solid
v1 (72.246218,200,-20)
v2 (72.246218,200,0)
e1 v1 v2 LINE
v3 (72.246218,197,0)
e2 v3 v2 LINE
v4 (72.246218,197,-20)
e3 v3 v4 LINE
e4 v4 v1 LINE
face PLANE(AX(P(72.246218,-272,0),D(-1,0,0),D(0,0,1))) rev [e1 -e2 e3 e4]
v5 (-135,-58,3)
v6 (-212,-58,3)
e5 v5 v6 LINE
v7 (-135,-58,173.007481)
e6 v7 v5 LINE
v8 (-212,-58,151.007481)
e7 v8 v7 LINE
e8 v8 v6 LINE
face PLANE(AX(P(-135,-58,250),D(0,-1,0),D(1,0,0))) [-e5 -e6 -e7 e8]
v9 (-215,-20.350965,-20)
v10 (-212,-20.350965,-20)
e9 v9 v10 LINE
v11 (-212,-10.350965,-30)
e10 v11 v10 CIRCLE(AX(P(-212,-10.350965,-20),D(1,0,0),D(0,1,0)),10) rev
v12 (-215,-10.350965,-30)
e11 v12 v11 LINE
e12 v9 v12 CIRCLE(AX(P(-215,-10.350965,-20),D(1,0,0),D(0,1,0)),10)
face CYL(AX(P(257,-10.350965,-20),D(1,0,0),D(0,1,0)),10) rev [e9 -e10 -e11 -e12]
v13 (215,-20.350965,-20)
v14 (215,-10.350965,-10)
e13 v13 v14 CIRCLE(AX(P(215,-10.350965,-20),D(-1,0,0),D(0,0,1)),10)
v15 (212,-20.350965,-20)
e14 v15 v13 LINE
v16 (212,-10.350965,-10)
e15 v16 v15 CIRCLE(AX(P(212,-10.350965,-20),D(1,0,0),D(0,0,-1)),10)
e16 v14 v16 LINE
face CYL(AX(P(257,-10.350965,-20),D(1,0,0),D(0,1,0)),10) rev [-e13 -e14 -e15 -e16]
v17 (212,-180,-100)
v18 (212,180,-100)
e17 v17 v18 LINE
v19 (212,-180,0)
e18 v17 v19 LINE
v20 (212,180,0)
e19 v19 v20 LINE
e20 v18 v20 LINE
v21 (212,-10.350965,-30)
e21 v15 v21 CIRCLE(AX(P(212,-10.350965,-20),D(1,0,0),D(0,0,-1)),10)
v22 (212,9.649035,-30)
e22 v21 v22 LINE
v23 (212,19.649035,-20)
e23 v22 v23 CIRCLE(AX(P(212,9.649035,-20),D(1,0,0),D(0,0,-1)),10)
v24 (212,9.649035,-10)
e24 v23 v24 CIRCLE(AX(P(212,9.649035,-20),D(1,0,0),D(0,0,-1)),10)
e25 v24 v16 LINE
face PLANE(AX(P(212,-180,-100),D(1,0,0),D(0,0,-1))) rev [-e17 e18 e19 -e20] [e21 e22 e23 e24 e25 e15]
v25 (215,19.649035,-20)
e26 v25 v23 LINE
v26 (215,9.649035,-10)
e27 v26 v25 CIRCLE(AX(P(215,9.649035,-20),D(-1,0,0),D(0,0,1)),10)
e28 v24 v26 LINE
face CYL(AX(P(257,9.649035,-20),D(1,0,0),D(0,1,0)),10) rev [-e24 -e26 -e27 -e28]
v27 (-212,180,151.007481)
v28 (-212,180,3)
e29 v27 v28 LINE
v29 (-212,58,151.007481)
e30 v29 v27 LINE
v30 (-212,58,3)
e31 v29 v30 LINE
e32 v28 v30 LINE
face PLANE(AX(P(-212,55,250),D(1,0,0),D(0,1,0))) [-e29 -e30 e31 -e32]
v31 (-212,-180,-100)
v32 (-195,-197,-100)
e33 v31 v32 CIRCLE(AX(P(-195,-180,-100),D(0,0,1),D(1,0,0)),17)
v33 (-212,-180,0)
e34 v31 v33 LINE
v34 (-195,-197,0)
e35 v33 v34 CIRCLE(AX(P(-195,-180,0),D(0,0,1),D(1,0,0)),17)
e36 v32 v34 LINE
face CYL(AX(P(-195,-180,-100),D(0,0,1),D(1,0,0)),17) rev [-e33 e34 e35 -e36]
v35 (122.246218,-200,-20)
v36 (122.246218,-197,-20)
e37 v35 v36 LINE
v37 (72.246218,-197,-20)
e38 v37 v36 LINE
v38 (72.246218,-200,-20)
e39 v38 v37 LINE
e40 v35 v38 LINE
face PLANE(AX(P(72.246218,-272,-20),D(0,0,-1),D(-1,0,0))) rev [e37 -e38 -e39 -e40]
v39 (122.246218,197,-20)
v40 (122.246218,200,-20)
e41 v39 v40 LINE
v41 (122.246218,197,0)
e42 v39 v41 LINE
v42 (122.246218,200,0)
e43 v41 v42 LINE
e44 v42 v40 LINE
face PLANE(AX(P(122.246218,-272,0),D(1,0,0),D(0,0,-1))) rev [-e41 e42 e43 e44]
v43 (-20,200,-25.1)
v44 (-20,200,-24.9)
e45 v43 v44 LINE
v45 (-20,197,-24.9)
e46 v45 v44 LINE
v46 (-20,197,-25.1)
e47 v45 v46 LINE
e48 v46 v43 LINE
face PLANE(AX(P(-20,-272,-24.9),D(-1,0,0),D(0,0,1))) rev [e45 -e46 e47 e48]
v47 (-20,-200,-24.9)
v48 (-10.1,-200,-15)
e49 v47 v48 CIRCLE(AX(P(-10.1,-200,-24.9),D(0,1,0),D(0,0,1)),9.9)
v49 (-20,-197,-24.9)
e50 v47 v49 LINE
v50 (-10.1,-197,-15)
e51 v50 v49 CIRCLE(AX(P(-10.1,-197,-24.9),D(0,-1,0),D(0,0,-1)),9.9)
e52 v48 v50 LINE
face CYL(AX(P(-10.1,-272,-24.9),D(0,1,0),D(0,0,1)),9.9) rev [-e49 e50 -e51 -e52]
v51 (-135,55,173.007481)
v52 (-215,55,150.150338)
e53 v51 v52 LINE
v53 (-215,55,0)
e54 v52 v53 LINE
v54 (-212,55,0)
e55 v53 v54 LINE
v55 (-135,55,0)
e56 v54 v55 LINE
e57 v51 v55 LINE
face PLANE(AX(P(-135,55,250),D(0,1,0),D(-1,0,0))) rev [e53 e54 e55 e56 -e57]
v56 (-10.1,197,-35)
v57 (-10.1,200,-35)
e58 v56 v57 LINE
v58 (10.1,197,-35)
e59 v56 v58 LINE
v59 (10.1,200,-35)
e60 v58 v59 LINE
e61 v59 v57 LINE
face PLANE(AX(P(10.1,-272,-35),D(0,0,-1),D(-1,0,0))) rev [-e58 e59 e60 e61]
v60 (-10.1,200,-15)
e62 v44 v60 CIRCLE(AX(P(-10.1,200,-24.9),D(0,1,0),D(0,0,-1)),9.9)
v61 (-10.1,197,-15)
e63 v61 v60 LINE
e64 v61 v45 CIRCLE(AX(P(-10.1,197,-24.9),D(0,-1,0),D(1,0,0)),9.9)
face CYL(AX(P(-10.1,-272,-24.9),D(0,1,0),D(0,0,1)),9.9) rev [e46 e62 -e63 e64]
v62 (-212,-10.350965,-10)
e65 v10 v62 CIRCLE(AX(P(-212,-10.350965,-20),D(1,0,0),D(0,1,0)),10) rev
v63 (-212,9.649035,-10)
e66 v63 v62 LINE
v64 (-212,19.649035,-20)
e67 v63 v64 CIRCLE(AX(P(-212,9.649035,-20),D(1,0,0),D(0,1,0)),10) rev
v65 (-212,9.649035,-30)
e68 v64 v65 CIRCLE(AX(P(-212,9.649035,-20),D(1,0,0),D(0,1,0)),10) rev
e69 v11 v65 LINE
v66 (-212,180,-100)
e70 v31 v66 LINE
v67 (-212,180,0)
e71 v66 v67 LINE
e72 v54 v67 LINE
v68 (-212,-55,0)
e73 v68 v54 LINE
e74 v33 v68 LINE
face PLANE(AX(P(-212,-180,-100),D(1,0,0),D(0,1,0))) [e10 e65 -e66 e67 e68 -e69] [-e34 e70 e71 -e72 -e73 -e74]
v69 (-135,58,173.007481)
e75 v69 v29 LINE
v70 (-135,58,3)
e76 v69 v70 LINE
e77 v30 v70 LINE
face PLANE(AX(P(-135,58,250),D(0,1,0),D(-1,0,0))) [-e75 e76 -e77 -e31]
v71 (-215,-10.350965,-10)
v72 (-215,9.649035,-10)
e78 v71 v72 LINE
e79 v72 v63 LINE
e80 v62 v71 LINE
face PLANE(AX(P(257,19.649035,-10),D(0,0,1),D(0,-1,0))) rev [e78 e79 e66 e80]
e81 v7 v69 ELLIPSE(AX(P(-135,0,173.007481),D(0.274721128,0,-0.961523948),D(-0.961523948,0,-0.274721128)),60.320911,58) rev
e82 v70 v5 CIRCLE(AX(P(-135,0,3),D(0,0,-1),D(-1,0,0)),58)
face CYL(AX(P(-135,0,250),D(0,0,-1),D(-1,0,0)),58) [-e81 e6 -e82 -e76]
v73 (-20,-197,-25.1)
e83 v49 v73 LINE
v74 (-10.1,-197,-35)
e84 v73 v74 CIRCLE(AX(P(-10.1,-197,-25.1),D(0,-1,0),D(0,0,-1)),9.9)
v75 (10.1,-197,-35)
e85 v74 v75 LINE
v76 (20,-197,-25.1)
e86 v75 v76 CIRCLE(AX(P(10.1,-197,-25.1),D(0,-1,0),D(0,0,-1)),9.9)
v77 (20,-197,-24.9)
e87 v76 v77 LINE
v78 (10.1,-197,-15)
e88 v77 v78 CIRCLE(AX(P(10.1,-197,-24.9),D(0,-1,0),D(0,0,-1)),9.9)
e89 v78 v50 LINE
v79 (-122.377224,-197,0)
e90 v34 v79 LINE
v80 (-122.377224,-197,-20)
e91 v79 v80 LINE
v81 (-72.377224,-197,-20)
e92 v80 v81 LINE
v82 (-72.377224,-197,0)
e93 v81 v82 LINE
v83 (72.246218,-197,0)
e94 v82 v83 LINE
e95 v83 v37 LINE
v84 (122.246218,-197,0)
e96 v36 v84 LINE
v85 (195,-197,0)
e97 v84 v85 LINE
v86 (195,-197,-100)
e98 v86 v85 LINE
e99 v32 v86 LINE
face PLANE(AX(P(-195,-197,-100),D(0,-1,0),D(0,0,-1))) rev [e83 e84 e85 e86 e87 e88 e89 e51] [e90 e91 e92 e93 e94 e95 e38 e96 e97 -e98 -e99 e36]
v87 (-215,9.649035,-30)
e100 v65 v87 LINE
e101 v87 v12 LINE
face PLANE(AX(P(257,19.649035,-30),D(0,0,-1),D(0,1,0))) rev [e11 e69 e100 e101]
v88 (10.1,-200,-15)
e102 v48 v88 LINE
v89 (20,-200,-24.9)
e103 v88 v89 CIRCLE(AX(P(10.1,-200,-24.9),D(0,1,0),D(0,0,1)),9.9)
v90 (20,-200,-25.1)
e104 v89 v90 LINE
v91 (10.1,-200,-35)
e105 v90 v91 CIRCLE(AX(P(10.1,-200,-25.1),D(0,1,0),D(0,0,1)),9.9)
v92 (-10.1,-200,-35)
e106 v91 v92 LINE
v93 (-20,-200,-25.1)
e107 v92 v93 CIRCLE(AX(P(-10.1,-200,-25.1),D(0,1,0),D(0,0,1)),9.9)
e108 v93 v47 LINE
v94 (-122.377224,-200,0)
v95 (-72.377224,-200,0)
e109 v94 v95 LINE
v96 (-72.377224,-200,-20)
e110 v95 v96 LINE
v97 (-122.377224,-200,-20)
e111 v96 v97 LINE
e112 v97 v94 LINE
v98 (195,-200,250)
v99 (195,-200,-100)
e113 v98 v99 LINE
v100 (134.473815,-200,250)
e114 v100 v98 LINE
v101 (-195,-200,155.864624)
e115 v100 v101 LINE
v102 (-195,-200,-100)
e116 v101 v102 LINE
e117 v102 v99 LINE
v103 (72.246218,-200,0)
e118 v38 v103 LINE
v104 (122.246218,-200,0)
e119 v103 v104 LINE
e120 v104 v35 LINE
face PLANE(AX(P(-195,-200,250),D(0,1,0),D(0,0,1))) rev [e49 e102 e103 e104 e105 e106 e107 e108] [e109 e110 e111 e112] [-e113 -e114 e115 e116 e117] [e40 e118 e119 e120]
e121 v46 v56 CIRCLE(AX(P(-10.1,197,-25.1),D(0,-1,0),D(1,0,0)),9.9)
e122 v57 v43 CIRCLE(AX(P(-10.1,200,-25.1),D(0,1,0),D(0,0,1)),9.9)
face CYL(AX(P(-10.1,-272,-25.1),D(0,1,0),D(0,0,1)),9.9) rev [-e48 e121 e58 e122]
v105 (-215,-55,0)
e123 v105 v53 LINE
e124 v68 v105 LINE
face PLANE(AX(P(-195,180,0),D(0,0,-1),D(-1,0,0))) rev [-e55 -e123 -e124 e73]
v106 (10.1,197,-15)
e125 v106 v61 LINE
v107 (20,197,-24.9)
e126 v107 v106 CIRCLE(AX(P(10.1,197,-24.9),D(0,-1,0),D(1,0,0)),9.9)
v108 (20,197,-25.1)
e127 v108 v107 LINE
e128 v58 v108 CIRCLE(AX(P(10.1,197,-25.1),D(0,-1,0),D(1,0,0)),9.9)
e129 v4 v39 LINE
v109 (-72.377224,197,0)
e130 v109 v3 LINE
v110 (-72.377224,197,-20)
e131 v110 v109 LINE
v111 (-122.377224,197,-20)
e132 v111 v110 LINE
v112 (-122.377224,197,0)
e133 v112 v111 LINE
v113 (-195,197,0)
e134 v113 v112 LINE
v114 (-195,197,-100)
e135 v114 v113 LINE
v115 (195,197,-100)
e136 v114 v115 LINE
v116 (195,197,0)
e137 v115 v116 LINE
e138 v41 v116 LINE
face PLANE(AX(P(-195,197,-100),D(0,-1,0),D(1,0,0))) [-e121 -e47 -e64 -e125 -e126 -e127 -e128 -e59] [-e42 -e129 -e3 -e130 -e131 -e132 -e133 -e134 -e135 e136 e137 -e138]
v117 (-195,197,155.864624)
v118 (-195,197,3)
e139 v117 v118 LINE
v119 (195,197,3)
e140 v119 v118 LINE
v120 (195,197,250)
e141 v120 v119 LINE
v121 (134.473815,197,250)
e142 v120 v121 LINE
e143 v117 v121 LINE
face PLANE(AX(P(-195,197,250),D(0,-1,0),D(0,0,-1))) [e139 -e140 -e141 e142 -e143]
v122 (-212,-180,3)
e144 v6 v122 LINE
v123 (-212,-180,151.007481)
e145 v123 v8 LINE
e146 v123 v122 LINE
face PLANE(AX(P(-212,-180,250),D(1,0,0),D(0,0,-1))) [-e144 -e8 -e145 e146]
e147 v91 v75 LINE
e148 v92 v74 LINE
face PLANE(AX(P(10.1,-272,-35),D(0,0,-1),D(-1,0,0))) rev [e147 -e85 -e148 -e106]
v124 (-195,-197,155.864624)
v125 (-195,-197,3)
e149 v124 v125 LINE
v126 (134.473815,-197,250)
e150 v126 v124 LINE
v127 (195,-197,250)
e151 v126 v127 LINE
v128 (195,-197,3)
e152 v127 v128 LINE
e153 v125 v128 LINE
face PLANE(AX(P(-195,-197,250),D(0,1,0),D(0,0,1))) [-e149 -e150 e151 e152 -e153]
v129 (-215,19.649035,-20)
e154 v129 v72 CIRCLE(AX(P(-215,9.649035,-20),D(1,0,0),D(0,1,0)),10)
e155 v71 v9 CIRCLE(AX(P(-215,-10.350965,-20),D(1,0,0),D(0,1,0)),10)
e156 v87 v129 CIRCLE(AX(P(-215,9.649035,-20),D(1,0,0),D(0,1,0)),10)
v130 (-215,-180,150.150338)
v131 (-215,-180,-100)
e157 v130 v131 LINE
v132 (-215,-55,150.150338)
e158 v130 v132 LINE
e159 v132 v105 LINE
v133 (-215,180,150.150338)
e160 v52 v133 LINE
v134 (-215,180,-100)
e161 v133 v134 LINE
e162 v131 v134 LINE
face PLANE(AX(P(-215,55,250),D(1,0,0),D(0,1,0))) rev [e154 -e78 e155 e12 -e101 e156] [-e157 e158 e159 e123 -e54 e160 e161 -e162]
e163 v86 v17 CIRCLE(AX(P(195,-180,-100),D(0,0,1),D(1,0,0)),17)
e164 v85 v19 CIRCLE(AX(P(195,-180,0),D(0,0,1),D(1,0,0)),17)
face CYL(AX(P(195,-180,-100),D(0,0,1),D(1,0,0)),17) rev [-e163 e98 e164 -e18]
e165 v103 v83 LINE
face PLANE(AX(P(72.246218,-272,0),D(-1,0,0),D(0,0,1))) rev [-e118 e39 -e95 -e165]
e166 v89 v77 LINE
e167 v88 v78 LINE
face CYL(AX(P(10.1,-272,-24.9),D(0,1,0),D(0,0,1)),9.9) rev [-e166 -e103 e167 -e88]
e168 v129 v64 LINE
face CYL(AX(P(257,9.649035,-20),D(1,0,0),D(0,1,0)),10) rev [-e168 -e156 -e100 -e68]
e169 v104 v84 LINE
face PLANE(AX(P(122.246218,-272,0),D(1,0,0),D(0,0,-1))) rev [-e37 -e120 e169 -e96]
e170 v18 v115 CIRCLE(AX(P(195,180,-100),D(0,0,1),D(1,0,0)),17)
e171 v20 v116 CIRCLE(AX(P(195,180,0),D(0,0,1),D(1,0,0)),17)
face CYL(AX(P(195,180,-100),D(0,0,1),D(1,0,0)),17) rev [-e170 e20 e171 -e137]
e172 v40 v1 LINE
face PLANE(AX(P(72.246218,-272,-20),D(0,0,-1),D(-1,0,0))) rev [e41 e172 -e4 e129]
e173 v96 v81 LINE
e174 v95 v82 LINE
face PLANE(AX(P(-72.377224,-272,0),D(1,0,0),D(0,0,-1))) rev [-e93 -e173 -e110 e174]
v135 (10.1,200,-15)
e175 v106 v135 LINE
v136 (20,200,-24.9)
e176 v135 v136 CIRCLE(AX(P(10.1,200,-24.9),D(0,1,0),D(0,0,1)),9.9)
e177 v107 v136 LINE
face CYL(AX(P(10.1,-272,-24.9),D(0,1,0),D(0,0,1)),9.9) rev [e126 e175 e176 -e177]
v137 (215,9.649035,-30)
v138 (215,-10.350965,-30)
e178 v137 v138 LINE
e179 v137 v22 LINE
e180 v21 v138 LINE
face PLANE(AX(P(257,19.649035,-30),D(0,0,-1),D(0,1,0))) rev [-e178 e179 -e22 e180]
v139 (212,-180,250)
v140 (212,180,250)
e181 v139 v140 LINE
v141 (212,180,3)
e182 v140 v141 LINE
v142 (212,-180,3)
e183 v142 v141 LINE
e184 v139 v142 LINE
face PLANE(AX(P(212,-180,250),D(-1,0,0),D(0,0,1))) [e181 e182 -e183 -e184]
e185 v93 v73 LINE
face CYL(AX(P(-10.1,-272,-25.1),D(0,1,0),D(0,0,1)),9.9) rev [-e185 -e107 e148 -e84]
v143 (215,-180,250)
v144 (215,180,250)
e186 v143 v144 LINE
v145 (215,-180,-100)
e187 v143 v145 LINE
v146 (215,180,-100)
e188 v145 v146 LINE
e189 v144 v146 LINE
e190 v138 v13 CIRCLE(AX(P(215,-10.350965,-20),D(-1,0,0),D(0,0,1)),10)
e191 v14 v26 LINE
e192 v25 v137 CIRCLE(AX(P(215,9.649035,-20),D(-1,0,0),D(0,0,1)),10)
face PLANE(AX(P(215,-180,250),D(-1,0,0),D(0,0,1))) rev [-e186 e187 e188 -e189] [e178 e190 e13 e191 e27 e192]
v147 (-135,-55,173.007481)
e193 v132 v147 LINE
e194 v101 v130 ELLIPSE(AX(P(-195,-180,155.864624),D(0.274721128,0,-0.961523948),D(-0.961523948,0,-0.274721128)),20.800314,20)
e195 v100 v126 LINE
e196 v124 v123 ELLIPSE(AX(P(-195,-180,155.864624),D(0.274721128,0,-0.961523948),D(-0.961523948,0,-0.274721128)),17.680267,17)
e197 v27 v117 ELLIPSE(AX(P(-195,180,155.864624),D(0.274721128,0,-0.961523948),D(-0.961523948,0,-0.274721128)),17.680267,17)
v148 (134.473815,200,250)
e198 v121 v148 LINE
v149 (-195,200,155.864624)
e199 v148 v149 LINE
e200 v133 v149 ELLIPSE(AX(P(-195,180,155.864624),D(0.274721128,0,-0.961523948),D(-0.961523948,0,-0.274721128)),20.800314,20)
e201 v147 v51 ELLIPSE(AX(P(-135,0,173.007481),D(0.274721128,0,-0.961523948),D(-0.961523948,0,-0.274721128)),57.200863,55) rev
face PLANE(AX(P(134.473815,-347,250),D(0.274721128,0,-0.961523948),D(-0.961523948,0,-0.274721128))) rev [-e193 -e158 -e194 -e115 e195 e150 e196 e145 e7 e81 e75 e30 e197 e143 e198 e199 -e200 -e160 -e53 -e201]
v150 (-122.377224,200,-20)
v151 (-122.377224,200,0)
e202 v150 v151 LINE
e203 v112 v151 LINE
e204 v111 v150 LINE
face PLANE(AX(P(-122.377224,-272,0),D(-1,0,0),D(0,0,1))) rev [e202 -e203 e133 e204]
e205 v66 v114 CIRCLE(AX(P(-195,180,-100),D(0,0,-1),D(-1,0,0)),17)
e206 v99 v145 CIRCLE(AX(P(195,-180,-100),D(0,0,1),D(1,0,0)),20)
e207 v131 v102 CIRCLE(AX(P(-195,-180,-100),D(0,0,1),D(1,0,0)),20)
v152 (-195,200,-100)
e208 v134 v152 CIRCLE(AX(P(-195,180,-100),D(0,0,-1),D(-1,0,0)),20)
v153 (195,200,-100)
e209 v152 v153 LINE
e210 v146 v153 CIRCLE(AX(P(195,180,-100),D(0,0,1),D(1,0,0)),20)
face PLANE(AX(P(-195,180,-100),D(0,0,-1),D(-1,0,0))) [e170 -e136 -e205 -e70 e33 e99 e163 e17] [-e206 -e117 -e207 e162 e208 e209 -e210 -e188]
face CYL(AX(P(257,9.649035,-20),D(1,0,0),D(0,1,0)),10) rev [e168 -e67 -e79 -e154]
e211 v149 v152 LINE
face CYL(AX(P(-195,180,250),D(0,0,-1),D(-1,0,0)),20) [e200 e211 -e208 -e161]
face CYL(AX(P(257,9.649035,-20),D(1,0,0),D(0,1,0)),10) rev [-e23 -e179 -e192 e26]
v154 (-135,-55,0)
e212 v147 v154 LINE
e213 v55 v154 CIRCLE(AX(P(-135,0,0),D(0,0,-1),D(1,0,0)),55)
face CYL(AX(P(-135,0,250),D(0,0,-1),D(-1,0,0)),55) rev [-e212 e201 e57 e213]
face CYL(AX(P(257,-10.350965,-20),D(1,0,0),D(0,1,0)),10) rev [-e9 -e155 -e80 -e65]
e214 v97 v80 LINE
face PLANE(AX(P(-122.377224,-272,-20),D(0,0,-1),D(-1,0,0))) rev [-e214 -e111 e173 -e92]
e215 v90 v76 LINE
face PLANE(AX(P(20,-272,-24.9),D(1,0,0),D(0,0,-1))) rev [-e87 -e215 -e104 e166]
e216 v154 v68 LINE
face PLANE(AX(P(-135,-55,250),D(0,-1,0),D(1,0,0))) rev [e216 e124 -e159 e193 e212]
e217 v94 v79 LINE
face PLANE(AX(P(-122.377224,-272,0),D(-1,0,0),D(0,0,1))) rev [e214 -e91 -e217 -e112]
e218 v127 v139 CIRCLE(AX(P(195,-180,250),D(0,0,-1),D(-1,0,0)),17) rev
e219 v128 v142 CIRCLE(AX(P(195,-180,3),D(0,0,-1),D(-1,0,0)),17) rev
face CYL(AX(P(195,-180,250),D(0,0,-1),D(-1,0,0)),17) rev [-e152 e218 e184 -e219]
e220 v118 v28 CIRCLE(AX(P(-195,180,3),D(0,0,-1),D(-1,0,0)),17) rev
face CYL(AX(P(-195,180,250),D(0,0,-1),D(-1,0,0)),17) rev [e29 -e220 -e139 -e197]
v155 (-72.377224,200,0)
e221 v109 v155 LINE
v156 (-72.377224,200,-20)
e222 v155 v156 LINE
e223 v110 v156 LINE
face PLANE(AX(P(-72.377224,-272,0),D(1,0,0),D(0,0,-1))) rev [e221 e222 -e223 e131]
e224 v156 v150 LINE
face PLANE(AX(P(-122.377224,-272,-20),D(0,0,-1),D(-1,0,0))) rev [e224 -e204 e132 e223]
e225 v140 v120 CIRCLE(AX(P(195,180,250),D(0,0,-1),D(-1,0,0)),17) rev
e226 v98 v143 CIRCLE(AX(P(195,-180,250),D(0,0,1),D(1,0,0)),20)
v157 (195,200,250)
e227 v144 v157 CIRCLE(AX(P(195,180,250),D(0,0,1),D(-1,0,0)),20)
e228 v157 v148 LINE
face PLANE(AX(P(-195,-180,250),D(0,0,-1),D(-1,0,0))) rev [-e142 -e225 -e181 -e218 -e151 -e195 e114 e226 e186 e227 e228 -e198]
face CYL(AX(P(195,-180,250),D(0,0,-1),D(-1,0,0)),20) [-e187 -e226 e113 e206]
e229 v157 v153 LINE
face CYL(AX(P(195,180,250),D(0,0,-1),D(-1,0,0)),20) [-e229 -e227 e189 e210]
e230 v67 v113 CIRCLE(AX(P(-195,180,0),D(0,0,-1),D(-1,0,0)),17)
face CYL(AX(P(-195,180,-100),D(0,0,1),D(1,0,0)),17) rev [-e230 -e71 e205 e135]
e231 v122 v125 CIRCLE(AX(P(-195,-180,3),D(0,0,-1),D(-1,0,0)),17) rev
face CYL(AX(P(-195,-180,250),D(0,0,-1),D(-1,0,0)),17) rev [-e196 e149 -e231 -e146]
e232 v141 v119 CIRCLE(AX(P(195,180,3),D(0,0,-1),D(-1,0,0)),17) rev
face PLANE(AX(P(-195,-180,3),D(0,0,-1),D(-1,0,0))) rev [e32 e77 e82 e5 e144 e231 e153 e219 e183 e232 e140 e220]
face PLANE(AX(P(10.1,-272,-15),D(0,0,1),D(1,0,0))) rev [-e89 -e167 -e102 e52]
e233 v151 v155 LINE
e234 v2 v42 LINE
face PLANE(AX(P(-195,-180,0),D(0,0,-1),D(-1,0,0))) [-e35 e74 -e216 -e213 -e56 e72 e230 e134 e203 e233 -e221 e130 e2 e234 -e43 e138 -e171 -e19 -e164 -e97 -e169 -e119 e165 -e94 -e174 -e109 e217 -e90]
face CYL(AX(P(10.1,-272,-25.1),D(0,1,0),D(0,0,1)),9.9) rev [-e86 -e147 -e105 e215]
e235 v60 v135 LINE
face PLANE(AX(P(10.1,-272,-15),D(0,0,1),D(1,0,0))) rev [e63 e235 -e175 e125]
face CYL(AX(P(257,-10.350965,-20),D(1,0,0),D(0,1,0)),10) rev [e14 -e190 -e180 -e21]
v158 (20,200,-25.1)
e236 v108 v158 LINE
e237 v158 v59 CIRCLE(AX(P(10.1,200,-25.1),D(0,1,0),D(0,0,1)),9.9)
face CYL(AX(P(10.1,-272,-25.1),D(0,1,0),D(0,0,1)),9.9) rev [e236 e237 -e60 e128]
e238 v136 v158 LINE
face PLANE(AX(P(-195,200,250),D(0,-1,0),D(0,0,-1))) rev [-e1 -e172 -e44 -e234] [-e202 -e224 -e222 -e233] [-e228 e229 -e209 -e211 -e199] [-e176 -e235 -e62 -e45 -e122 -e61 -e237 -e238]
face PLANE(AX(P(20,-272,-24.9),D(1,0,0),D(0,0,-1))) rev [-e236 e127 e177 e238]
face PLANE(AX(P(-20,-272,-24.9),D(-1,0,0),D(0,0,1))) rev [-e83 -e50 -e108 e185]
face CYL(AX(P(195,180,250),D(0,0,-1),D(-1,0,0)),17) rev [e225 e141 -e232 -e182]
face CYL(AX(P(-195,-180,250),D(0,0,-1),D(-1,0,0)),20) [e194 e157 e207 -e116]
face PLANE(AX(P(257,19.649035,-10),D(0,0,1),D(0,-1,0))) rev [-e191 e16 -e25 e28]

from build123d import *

# Parameters (mm, degrees)
EXTRUDE_1_DEPTH     = 250
SHELL_1_T           = -3
CUT_EXTRUDE_1_DEPTH = 547
EXTRUDE_START       = 100
EXTRUDE_3_DEPTH     = 100
SKETCH_6_W          = 50
SKETCH_6_H          = 20
CUT_EXTRUDE_3_DEPTH = 472
SKETCH_7_W          = 20
SKETCH_7_H          = 40
CUT_EXTRUDE_4_DEPTH = 472
FILLET_1_R          = 10
FILLET_2_R          = 10
CUT_EXTRUDE_5_DEPTH = 472


with BuildPart() as part:
    # 草图1 → 凸台-拉伸1 (new body)
    with BuildSketch(Plane.XY):
        with BuildLine():
            Line((-135, 55), (-215, 55))
            Line((-215, 55), (-215, 180))
            ThreePointArc((-215, 180), (-209.142135624, 194.142135624), (-195, 200))
            Line((-195, 200), (195, 200))
            ThreePointArc((195, 200), (209.142135624, 194.142135624), (215, 180))
            Line((215, 180), (215, -180))
            ThreePointArc((215, -180), (209.142135624, -194.142135624), (195, -200))
            Line((195, -200), (-195, -200))
            ThreePointArc((-195, -200), (-209.142135624, -194.142135624), (-215, -180))
            Line((-215, -180), (-215, -55))
            Line((-215, -55), (-135, -55))
            ThreePointArc((-135, -55), (-80, 0), (-135, 55))
        make_face()
    extrude(amount=EXTRUDE_1_DEPTH)

    # 抽壳1
    shell_1_openings = [part.faces().sort_by_distance(p)[0] for p in [
        (13.096091643, 0, 250),
    ]]
    offset(amount=SHELL_1_T, openings=shell_1_openings, kind=Kind.INTERSECTION)

    # 草图3 → 切除-拉伸1 (cut)
    with BuildSketch(Plane(origin=(0, 200, 0), x_dir=(1, 0, 0), z_dir=(0, 1, 0))):
        Polygon((134.47381547, -250), (-215.52618453, -150), (-215.52618453, -250), align=None)
    extrude(amount=-CUT_EXTRUDE_1_DEPTH, mode=Mode.SUBTRACT)

    # 草图4 → 凸台-拉伸3 (add)
    with BuildSketch(Plane(origin=(0, 0, 0), x_dir=(-1, 0, 0), z_dir=(0, 0, -1)).offset(EXTRUDE_START)):
        with BuildLine():
            Line((195, -200), (-195, -200))
            ThreePointArc((-195, -200), (-209.142135624, -194.142135624), (-215, -180))
            Line((-215, -180), (-215, 180))
            ThreePointArc((-215, 180), (-209.142135624, 194.142135624), (-195, 200))
            Line((-195, 200), (195, 200))
            ThreePointArc((195, 200), (209.142135624, 194.142135624), (215, 180))
            Line((215, 180), (215, -180))
            ThreePointArc((215, -180), (209.142135624, -194.142135624), (195, -200))
        make_face()
        with BuildLine():
            Line((195, -197), (-195, -197))
            ThreePointArc((-195, -197), (-207.02081528, -192.02081528), (-212, -180))
            Line((-212, -180), (-212, 180))
            ThreePointArc((-212, 180), (-207.02081528, 192.02081528), (-195, 197))
            Line((-195, 197), (195, 197))
            ThreePointArc((195, 197), (207.02081528, 192.02081528), (212, 180))
            Line((212, 180), (212, -180))
            ThreePointArc((212, -180), (207.02081528, -192.02081528), (195, -197))
        make_face(mode=Mode.SUBTRACT)
    extrude(amount=-EXTRUDE_3_DEPTH)

    # 草图6 → 切除-拉伸3 (cut)
    with BuildSketch(Plane(origin=(0, 200, 0), x_dir=(1, 0, 0), z_dir=(0, 1, 0))):
        with Locations((-97.377223929, 10)):
            Rectangle(SKETCH_6_W, SKETCH_6_H)
        with Locations((97.246218359, 10)):
            Rectangle(SKETCH_6_W, SKETCH_6_H)
    extrude(amount=-CUT_EXTRUDE_3_DEPTH, mode=Mode.SUBTRACT)

    # 草图7 → 切除-拉伸4 (cut)
    with BuildSketch(Plane.ZY.offset(215)):
        with Locations((-20, -0.350965312)):
            Rectangle(SKETCH_7_W, SKETCH_7_H)
    extrude(amount=-CUT_EXTRUDE_4_DEPTH, mode=Mode.SUBTRACT)

    # 圆角1
    fillet_1_edges = [part.edges().sort_by_distance(p)[0] for p in [
        (-213.5, -20.350965312, -30),
        (-213.5, -20.350965312, -10),
        (-213.5, 19.649034688, -10),
        (-213.5, 19.649034688, -30),
    ]]
    fillet(fillet_1_edges, radius=FILLET_1_R - 0.0001)  # a hair under: the kernel refuses the full size

    # 圆角2
    fillet_2_edges = [part.edges().sort_by_distance(p)[0] for p in [
        (213.5, -20.350965312, -30),
        (213.5, 19.649034688, -30),
        (213.5, 19.649034688, -10),
        (213.5, -20.350965312, -10),
    ]]
    fillet(fillet_2_edges, radius=FILLET_2_R - 0.0001)  # a hair under: the kernel refuses the full size

    # 草图8 → 切除-拉伸5 (cut)
    with BuildSketch(Plane(origin=(0, 200, 0), x_dir=(1, 0, 0), z_dir=(0, 1, 0))):
        with BuildLine():
            Line((10.1, 15), (-10.1, 15))
            ThreePointArc((-10.1, 15), (-17.100357134, 17.899642866), (-20, 24.9))
            Line((-20, 24.9), (-20, 25.1))
            ThreePointArc((-20, 25.1), (-17.100357134, 32.100357134), (-10.1, 35))
            Line((-10.1, 35), (10.1, 35))
            ThreePointArc((10.1, 35), (17.100357134, 32.100357134), (20, 25.1))
            Line((20, 25.1), (20, 24.9))
            ThreePointArc((20, 24.9), (17.100357134, 17.899642866), (10.1, 15))
        make_face()
    extrude(amount=-CUT_EXTRUDE_5_DEPTH, mode=Mode.SUBTRACT)


solid = part.part
